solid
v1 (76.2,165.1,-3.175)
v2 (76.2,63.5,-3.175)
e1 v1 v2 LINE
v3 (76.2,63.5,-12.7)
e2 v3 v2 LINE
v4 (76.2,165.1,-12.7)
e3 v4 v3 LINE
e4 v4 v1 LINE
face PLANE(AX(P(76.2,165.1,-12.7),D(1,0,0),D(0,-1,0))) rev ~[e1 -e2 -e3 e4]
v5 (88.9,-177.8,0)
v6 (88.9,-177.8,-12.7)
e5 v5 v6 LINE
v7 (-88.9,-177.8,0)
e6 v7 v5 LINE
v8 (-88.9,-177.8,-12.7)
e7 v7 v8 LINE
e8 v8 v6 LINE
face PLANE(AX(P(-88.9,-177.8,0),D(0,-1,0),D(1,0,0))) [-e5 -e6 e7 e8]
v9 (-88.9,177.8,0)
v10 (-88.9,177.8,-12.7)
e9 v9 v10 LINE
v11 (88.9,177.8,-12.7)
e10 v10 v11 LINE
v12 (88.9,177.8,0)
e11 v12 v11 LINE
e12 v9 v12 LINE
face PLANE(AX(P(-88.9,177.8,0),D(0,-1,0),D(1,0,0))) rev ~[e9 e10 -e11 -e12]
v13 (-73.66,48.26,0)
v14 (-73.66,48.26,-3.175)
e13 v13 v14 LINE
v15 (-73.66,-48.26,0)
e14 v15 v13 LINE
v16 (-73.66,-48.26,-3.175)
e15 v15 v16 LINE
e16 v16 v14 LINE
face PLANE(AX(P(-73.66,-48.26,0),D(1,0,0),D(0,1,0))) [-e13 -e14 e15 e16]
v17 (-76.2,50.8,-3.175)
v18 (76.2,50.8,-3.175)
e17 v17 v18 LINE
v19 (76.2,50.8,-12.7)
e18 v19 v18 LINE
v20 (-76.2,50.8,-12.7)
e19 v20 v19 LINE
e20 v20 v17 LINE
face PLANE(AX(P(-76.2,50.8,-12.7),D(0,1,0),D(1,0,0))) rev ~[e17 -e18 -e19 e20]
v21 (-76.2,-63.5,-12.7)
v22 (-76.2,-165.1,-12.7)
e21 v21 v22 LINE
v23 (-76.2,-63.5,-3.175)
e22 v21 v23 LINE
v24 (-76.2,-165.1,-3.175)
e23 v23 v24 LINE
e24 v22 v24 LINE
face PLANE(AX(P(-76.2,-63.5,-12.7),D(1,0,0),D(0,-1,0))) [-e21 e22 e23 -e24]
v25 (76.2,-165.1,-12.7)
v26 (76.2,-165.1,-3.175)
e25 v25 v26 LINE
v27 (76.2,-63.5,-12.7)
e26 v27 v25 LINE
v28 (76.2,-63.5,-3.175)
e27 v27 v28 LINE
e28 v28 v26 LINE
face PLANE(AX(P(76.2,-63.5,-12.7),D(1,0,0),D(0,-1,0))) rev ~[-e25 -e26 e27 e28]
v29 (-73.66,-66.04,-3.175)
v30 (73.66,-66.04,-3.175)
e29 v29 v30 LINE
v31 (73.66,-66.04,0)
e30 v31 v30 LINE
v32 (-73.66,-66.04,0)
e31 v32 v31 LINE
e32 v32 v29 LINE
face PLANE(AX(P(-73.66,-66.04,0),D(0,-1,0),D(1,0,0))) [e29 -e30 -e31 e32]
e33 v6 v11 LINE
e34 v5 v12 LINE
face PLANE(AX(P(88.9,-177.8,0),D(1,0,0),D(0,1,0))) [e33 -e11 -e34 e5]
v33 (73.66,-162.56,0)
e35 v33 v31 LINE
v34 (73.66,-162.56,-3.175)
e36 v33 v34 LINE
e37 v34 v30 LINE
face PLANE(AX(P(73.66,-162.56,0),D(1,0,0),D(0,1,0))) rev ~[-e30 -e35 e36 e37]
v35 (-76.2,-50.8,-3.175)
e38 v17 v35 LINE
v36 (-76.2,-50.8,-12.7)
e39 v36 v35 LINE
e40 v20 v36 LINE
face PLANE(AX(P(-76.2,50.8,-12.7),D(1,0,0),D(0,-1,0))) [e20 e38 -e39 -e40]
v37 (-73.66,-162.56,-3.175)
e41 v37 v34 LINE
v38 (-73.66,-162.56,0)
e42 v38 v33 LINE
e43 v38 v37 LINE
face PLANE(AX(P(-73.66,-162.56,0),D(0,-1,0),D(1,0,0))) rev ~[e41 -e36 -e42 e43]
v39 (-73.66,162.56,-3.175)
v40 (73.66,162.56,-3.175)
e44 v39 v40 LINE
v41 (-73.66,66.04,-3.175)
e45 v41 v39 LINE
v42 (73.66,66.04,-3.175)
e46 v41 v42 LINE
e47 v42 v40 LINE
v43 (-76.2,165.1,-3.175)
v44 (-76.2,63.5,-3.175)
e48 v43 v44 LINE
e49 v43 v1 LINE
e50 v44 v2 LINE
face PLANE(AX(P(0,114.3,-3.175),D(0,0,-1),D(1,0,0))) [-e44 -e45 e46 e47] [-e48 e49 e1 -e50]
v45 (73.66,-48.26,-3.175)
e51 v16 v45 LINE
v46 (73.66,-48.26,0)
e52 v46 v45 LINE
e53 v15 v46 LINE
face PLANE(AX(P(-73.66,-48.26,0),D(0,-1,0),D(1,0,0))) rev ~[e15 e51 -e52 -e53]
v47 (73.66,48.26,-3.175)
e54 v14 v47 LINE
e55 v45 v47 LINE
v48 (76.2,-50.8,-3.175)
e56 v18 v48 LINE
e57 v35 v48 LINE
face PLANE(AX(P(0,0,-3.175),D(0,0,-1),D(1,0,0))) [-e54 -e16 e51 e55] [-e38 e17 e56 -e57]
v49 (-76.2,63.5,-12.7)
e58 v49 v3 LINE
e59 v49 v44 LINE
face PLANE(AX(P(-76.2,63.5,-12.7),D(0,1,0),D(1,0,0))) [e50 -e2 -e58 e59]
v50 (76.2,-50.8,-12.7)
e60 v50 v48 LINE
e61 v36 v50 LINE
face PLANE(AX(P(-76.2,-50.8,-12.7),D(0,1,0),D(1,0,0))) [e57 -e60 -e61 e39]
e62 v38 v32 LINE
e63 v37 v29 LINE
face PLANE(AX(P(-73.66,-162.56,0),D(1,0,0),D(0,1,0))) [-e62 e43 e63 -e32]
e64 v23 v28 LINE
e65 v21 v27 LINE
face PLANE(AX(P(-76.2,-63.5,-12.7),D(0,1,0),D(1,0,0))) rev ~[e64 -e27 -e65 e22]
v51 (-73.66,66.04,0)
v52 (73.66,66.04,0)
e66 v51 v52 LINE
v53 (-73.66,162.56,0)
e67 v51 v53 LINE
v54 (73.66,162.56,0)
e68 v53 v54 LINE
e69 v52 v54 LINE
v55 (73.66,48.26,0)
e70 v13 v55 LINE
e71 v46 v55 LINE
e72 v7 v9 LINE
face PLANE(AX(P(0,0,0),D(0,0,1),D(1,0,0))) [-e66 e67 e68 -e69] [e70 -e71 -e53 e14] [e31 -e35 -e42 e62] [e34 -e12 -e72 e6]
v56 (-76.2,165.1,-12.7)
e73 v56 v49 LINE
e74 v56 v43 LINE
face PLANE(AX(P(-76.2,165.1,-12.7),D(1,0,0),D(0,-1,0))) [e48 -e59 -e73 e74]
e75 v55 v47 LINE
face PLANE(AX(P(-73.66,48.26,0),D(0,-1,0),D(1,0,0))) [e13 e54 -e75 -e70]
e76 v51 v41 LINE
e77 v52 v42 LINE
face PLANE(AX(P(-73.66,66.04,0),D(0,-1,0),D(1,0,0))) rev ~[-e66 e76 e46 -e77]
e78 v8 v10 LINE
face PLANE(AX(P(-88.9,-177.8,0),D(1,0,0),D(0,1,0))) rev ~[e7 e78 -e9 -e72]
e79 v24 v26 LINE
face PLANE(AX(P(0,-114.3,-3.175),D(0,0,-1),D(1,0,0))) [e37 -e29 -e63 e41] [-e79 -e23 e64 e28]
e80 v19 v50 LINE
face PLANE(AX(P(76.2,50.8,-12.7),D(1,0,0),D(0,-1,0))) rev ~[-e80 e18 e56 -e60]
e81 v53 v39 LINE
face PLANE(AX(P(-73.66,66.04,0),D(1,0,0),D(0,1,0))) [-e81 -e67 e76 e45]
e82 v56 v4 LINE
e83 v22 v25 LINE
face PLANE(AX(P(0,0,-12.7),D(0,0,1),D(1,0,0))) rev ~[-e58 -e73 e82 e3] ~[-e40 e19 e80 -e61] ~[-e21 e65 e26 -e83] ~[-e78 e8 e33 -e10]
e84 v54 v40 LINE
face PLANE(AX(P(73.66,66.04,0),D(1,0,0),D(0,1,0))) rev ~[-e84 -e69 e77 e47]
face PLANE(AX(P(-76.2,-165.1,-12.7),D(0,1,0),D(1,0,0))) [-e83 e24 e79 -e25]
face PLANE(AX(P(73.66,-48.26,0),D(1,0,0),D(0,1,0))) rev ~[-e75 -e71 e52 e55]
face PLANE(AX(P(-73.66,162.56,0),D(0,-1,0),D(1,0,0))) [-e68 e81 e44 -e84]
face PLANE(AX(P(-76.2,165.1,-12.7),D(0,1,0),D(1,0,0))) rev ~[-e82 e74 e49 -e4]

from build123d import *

# Parameters (mm, degrees)
F0_W     = 177.8
F0_H     = 355.6
F2_DEPTH = 12.7
F1_W     = 147.32
F1_H     = 96.52
F4_DEPTH = 12.701
F8_W     = 152.4
F8_H     = 101.6
F9_DEPTH = 9.525


# Not quite as in the source:
# - a length typed as a fraction of an inch, garbled in the dataset ("3 / 203.2 mm" for 3/8 in), is restored


with BuildPart() as f2:
    # F0 (on Top) → F2 (new body)
    with BuildSketch(Plane.XY):
        Rectangle(F0_W, F0_H)
    extrude(amount=-F2_DEPTH)

    # F1 (on face) → F4 (cut, through all)
    with BuildSketch(Plane.XY):
        with Locations((0, -114.3)):
            Rectangle(F1_W, F1_H)
        Rectangle(F1_W, F1_H)
        with Locations((0, 114.3)):
            Rectangle(F1_W, F1_H)
    extrude(amount=-F4_DEPTH, mode=Mode.SUBTRACT)

    # F8 (on face) → F9 (cut)
    with BuildSketch(Plane(origin=(0, 0, -12.7), x_dir=(1, 0, 0), z_dir=(0, 0, -1))):
        with Locations((0, -114.3)):
            Rectangle(F8_W, F8_H)
        Rectangle(F8_W, F8_H)
        with Locations((0, 114.3)):
            Rectangle(F8_W, F8_H)
    extrude(amount=-F9_DEPTH, mode=Mode.SUBTRACT)


solid = f2.part
